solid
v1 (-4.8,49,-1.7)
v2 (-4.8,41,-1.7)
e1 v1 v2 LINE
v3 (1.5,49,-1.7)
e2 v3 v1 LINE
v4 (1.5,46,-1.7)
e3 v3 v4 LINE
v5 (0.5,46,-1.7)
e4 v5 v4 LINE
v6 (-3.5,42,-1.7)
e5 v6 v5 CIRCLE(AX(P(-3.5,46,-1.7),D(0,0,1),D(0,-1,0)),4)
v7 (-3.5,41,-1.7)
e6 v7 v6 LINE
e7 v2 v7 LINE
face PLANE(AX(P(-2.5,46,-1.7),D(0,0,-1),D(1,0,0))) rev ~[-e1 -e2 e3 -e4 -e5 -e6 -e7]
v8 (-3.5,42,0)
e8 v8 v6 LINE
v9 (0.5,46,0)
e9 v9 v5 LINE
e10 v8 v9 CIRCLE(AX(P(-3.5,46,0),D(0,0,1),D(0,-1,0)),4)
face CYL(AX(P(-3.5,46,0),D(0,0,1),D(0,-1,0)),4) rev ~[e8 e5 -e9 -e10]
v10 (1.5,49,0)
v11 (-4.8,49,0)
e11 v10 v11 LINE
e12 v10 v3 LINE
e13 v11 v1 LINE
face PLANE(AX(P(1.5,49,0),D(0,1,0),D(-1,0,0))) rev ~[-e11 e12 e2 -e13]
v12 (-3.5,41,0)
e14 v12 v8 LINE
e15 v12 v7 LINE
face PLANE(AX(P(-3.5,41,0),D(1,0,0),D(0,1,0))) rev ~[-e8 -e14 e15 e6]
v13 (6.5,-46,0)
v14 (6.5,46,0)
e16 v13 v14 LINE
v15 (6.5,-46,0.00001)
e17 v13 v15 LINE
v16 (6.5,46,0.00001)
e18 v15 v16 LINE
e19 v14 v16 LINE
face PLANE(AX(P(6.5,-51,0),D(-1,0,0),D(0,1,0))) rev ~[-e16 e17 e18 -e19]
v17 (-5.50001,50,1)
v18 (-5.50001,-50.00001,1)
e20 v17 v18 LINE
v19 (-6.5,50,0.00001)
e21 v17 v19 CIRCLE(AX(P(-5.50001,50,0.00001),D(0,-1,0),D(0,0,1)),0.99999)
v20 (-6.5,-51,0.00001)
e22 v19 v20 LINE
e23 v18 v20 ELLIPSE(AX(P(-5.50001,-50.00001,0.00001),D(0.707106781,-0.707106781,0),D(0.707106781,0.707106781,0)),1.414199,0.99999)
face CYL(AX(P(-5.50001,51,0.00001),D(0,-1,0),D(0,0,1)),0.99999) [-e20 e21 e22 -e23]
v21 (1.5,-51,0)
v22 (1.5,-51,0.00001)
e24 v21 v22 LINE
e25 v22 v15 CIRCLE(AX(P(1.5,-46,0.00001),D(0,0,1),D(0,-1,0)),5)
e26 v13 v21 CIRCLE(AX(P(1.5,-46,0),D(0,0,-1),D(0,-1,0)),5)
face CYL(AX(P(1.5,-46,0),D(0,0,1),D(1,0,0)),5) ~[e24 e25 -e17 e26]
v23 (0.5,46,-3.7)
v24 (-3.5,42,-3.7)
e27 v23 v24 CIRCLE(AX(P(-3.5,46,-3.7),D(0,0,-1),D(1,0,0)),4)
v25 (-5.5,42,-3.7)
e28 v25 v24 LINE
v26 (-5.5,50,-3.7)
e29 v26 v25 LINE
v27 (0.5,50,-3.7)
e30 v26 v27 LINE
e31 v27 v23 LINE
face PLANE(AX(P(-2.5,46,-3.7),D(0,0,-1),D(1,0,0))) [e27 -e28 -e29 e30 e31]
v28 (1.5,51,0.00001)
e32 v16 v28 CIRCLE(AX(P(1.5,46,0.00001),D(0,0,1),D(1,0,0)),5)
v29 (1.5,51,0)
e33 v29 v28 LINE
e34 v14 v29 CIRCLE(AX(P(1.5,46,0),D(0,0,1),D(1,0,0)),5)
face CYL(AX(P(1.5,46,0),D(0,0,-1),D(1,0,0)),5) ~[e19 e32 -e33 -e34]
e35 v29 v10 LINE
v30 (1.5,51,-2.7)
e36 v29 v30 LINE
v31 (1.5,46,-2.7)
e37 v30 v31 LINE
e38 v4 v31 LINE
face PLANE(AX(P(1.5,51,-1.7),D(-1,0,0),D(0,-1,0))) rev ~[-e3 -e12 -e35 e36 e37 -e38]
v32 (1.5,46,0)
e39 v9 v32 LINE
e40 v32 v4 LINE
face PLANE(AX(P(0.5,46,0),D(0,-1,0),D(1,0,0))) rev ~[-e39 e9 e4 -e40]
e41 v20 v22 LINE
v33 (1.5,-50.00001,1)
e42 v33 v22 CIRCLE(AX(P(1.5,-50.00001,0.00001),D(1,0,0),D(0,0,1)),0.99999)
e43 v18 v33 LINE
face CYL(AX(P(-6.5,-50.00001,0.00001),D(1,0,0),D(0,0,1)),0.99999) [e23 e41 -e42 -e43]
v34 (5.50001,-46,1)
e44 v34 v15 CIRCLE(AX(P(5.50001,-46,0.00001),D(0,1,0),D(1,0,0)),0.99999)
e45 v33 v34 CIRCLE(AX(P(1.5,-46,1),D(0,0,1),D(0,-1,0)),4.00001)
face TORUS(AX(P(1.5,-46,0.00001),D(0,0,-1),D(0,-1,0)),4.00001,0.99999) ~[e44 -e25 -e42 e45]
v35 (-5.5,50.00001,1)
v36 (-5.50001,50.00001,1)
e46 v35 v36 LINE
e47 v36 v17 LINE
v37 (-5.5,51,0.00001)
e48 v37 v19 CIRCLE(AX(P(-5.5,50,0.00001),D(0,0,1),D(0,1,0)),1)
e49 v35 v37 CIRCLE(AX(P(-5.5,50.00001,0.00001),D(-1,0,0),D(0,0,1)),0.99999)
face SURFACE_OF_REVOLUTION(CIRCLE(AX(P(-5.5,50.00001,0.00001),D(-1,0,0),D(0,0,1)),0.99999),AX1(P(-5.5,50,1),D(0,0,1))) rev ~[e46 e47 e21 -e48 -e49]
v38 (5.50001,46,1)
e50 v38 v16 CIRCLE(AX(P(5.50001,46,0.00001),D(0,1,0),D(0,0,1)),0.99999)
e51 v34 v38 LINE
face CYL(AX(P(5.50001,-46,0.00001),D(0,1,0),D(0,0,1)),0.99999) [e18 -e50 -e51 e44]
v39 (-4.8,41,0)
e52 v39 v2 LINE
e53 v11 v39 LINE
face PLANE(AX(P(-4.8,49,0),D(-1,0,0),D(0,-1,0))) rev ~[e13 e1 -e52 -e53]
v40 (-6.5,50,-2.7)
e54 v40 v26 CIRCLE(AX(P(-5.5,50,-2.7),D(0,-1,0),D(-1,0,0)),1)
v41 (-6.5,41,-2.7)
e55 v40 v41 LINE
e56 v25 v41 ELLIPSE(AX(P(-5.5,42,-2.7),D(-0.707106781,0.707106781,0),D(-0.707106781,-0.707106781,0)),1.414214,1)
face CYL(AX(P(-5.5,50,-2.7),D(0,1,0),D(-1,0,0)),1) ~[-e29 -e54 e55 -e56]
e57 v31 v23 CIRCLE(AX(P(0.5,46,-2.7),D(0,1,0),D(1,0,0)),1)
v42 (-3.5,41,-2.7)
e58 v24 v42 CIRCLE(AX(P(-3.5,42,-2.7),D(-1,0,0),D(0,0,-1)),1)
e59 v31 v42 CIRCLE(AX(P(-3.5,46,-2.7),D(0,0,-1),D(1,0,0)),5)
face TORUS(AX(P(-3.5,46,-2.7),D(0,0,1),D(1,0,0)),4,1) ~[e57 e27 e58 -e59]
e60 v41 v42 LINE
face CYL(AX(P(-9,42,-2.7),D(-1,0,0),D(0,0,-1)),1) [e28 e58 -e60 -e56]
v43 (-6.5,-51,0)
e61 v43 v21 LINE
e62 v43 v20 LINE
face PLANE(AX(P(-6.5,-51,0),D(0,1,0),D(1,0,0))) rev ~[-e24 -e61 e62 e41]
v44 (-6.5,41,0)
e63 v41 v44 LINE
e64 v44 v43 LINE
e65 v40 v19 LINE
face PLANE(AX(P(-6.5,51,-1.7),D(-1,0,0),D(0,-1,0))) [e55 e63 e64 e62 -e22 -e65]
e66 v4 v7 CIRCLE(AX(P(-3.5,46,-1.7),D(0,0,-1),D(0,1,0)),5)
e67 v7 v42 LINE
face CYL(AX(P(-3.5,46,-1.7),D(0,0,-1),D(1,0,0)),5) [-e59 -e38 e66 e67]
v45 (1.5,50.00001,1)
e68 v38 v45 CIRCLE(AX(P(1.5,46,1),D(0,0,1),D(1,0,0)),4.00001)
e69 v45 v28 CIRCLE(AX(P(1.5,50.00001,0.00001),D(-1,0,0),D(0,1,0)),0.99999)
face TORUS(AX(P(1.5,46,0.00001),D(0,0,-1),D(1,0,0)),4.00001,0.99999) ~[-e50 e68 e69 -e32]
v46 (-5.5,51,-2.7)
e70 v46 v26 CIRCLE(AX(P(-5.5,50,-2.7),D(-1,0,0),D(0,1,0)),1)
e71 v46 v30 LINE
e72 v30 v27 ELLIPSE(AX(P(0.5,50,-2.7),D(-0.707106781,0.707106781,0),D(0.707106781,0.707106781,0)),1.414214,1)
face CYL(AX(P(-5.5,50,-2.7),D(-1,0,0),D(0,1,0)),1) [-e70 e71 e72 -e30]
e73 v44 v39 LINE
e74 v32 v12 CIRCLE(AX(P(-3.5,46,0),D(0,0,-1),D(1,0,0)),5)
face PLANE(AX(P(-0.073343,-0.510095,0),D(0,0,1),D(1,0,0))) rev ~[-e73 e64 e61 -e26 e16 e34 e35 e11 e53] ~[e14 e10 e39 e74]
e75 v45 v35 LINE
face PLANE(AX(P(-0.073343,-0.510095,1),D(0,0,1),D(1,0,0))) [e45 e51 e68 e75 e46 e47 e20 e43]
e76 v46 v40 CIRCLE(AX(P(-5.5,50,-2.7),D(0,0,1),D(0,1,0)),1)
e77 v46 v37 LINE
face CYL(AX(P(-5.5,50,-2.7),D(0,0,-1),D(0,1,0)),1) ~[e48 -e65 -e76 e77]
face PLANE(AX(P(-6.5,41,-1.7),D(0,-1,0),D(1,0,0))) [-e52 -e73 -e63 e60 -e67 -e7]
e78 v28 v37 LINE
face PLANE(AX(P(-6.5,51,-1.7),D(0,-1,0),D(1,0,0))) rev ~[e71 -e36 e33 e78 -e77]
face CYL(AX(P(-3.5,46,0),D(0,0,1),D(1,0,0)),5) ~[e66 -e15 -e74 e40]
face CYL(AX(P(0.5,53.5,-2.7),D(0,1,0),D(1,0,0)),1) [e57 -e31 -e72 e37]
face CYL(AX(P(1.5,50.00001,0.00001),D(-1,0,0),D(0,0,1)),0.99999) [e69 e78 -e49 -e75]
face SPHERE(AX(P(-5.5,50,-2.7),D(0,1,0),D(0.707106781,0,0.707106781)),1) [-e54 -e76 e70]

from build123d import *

# Parameters (mm, degrees)
F1_DEPTH     = 1
F2_W         = 1.7
F2_H         = 2
F2_W_2       = 6.3
F2_H_2       = 8
F3_DEPTH     = 1.7
F4_W         = 8
F4_H         = 10
F5_DEPTH     = 2
F6_R         = 5
F7_R         = 0.99999
F8_T1_DEPTH  = 3.7
F8_T3_DEPTH  = 7.5
F8_T5_DEPTH  = 9.5
F8_T7_DEPTH  = 5.5
F8_T9_DEPTH  = 11.5
F8_T12_ANGLE = 90
F8_S15_W     = 1
F8_S15_H     = 1
F8_T16_DEPTH = 1
F8_T20_ANGLE = 90
F10_DEPTH    = 1.7


# Not quite as in the source:
# - a fillet or chamfer that OpenCascade refuses, or shapes differently, is made with other operations: its cross-section is extruded or revolved along the edge and cut away or added
# - a fillet or chamfer is up to 0.001 mm smaller than in the source, because OpenCascade refuses the exact size


with BuildPart() as f1:
    # F0 (on Top) → F1 (new body)
    with BuildSketch(Plane.XY):
        with BuildLine():
            Line((-6.5, -51), (6.5, -51))
            Line((6.5, -51), (6.5, 46))
            ThreePointArc((6.5, 46), (5.0355339059, 49.5355339059), (1.5, 51))
            Line((1.5, 51), (-6.5, 51))
            Line((-6.5, 51), (-6.5, -51))
        make_face()
    extrude(amount=F1_DEPTH)

    # F2 (on face) → F3 (join)
    with BuildSketch(Plane(origin=(0, 0, 0), x_dir=(1, 0, 0), z_dir=(0, 0, -1))):
        with Locations((-5.65, -50)):
            Rectangle(F2_W, F2_H)
        with Locations((-1.65, -50)):
            Rectangle(F2_W_2, F2_H)
        with Locations((-5.65, -45)):
            Rectangle(F2_W, F2_H_2)
    extrude(amount=F3_DEPTH)

    # F4 (on face) → F5 (join)
    with BuildSketch(Plane(origin=(0, 0, -1.7), x_dir=(1, 0, 0), z_dir=(0, 0, -1))):
        with Locations((-2.5, -46)):
            Rectangle(F4_W, F4_H)
    extrude(amount=F5_DEPTH)

    # F6
    f6_edges = [f1.edges().sort_by_distance(p)[0] for p in [
        (6.5, -51, 0.5),
        (1.5, 41, -2.7),
    ]]
    fillet(f6_edges, radius=F6_R)

    # F7 (radius 1 in the source; OpenCascade refuses exactly that, so slightly less here)
    f7_edges = [f1.edges().sort_by_distance(p)[0] for p in [
        (-2.5, -51, 1),
        (5.035534, -49.535534, 1),
        (-6.5, 0, 1),
        (6.5, 0, 1),
        (-2.5, 51, 1),
        (5.035534, 49.535534, 1),
    ]]
    fillet(f7_edges, radius=F7_R)

    # F8: fillet of radius 1 on 6 edges, made by hand

    # F8_s2 → F8_t1 (cut)
    with BuildSketch(Plane.XY.offset(-2.7)):
        with BuildLine():
            ThreePointArc((-5.5, 51), (-6.2071067812, 50.7071067812), (-6.5, 50))
            Line((-6.5, 50), (-6.5, 51))
            Line((-6.5, 51), (-5.5, 51))
        make_face()
    extrude(amount=F8_T1_DEPTH, mode=Mode.SUBTRACT)

    # F8_s4 → F8_t3 (cut)
    with BuildSketch(Plane.XZ.offset(-53.5)):
        with BuildLine():
            ThreePointArc((1.5, -2.7), (1.2071067812, -3.4071067812), (0.5, -3.7))
            Line((0.5, -3.7), (1.5, -3.7))
            Line((1.5, -3.7), (1.5, -2.7))
        make_face()
    extrude(amount=F8_T3_DEPTH, mode=Mode.SUBTRACT)

    # F8_s6 → F8_t5 (cut)
    with BuildSketch(Plane.YZ.offset(-5.5)):
        with BuildLine():
            ThreePointArc((51, -2.7), (50.7071067812, -3.4071067812), (50, -3.7))
            Line((50, -3.7), (51, -3.7))
            Line((51, -3.7), (51, -2.7))
        make_face()
    extrude(amount=F8_T5_DEPTH, mode=Mode.SUBTRACT)

    # F8_s8 → F8_t7 (cut)
    with BuildSketch(Plane.YZ.offset(-9)):
        with BuildLine():
            ThreePointArc((42, -3.7), (41.2928932188, -3.4071067812), (41, -2.7))
            Line((41, -2.7), (41, -3.7))
            Line((41, -3.7), (42, -3.7))
        make_face()
    extrude(amount=F8_T7_DEPTH, mode=Mode.SUBTRACT)

    # F8_s10 → F8_t9 (cut)
    with BuildSketch(Plane.XZ.offset(-50)):
        with BuildLine():
            ThreePointArc((-6.5, -2.7), (-6.2071067812, -3.4071067812), (-5.5, -3.7))
            Line((-5.5, -3.7), (-6.5, -3.7))
            Line((-6.5, -3.7), (-6.5, -2.7))
        make_face()
    extrude(amount=F8_T9_DEPTH, mode=Mode.SUBTRACT)

    # F8_s11 → F8_t12 (revolve, cut)
    with BuildSketch(Plane.YZ.offset(-5.5)):
        with BuildLine():
            ThreePointArc((50.00001, 1), (50.7071097101, 0.7071097101), (51, 1e-05))
            Line((51, 1e-05), (51, 1))
            Line((51, 1), (50.00001, 1))
        make_face()
    revolve(axis=Axis((-5.5, 50, 1), (0, 0, 1)), revolution_arc=F8_T12_ANGLE, mode=Mode.SUBTRACT)


with BuildPart() as f8_tool14:
    # F8_s15 → F8_t16 (new body)
    with BuildSketch(Plane.XZ.offset(-50)):
        with Locations((-6, -3.2)):
            Rectangle(F8_S15_W, F8_S15_H)
    extrude(amount=-F8_T16_DEPTH)

    # F8_s17 → F8_t18 (revolve, cut)
    with BuildSketch(Plane(origin=(-5.5, 50, -2.7), x_dir=(0.7071067812, 0, 0.7071067812), z_dir=(-0.7071067812, 0, 0.7071067812))):
        with BuildLine():
            ThreePointArc((0, -1), (1, 0), (0, 1))
            Line((0, 1), (0, -1))
        make_face()
    revolve(axis=Axis((-5.5, 50, -2.7), (0, 1, 0)), mode=Mode.SUBTRACT)


with BuildPart() as f1_1:
    add(f1.part)

    # F8_t13: cut F8_tool14
    add(f8_tool14.part, mode=Mode.SUBTRACT)

    # F8_s19 → F8_t20 (revolve, cut)
    with BuildSketch(Plane.XZ.offset(-46)):
        with BuildLine():
            ThreePointArc((0.5, -3.7), (1.2071067812, -3.4071067812), (1.5, -2.7))
            Line((1.5, -2.7), (1.5, -3.7))
            Line((1.5, -3.7), (0.5, -3.7))
        make_face()
    revolve(axis=Axis((-3.5, 46, -3.7), (0, 0, -1)), revolution_arc=F8_T20_ANGLE, mode=Mode.SUBTRACT)

    # F9 (on face) → F10 (join, through all)
    with BuildSketch(Plane(origin=(0, 0, 0), x_dir=(1, 0, 0), z_dir=(0, 0, -1))):
        with BuildLine():
            ThreePointArc((-3.5, -42), (-0.6715728753, -43.1715728753), (0.5, -46))
            Line((0.5, -46), (1.5, -46))
            ThreePointArc((1.5, -46), (0.0355339059, -42.4644660941), (-3.5, -41))
            Line((-3.5, -41), (-3.5, -42))
        make_face()
    extrude(amount=F10_DEPTH)


solid = f1_1.part
